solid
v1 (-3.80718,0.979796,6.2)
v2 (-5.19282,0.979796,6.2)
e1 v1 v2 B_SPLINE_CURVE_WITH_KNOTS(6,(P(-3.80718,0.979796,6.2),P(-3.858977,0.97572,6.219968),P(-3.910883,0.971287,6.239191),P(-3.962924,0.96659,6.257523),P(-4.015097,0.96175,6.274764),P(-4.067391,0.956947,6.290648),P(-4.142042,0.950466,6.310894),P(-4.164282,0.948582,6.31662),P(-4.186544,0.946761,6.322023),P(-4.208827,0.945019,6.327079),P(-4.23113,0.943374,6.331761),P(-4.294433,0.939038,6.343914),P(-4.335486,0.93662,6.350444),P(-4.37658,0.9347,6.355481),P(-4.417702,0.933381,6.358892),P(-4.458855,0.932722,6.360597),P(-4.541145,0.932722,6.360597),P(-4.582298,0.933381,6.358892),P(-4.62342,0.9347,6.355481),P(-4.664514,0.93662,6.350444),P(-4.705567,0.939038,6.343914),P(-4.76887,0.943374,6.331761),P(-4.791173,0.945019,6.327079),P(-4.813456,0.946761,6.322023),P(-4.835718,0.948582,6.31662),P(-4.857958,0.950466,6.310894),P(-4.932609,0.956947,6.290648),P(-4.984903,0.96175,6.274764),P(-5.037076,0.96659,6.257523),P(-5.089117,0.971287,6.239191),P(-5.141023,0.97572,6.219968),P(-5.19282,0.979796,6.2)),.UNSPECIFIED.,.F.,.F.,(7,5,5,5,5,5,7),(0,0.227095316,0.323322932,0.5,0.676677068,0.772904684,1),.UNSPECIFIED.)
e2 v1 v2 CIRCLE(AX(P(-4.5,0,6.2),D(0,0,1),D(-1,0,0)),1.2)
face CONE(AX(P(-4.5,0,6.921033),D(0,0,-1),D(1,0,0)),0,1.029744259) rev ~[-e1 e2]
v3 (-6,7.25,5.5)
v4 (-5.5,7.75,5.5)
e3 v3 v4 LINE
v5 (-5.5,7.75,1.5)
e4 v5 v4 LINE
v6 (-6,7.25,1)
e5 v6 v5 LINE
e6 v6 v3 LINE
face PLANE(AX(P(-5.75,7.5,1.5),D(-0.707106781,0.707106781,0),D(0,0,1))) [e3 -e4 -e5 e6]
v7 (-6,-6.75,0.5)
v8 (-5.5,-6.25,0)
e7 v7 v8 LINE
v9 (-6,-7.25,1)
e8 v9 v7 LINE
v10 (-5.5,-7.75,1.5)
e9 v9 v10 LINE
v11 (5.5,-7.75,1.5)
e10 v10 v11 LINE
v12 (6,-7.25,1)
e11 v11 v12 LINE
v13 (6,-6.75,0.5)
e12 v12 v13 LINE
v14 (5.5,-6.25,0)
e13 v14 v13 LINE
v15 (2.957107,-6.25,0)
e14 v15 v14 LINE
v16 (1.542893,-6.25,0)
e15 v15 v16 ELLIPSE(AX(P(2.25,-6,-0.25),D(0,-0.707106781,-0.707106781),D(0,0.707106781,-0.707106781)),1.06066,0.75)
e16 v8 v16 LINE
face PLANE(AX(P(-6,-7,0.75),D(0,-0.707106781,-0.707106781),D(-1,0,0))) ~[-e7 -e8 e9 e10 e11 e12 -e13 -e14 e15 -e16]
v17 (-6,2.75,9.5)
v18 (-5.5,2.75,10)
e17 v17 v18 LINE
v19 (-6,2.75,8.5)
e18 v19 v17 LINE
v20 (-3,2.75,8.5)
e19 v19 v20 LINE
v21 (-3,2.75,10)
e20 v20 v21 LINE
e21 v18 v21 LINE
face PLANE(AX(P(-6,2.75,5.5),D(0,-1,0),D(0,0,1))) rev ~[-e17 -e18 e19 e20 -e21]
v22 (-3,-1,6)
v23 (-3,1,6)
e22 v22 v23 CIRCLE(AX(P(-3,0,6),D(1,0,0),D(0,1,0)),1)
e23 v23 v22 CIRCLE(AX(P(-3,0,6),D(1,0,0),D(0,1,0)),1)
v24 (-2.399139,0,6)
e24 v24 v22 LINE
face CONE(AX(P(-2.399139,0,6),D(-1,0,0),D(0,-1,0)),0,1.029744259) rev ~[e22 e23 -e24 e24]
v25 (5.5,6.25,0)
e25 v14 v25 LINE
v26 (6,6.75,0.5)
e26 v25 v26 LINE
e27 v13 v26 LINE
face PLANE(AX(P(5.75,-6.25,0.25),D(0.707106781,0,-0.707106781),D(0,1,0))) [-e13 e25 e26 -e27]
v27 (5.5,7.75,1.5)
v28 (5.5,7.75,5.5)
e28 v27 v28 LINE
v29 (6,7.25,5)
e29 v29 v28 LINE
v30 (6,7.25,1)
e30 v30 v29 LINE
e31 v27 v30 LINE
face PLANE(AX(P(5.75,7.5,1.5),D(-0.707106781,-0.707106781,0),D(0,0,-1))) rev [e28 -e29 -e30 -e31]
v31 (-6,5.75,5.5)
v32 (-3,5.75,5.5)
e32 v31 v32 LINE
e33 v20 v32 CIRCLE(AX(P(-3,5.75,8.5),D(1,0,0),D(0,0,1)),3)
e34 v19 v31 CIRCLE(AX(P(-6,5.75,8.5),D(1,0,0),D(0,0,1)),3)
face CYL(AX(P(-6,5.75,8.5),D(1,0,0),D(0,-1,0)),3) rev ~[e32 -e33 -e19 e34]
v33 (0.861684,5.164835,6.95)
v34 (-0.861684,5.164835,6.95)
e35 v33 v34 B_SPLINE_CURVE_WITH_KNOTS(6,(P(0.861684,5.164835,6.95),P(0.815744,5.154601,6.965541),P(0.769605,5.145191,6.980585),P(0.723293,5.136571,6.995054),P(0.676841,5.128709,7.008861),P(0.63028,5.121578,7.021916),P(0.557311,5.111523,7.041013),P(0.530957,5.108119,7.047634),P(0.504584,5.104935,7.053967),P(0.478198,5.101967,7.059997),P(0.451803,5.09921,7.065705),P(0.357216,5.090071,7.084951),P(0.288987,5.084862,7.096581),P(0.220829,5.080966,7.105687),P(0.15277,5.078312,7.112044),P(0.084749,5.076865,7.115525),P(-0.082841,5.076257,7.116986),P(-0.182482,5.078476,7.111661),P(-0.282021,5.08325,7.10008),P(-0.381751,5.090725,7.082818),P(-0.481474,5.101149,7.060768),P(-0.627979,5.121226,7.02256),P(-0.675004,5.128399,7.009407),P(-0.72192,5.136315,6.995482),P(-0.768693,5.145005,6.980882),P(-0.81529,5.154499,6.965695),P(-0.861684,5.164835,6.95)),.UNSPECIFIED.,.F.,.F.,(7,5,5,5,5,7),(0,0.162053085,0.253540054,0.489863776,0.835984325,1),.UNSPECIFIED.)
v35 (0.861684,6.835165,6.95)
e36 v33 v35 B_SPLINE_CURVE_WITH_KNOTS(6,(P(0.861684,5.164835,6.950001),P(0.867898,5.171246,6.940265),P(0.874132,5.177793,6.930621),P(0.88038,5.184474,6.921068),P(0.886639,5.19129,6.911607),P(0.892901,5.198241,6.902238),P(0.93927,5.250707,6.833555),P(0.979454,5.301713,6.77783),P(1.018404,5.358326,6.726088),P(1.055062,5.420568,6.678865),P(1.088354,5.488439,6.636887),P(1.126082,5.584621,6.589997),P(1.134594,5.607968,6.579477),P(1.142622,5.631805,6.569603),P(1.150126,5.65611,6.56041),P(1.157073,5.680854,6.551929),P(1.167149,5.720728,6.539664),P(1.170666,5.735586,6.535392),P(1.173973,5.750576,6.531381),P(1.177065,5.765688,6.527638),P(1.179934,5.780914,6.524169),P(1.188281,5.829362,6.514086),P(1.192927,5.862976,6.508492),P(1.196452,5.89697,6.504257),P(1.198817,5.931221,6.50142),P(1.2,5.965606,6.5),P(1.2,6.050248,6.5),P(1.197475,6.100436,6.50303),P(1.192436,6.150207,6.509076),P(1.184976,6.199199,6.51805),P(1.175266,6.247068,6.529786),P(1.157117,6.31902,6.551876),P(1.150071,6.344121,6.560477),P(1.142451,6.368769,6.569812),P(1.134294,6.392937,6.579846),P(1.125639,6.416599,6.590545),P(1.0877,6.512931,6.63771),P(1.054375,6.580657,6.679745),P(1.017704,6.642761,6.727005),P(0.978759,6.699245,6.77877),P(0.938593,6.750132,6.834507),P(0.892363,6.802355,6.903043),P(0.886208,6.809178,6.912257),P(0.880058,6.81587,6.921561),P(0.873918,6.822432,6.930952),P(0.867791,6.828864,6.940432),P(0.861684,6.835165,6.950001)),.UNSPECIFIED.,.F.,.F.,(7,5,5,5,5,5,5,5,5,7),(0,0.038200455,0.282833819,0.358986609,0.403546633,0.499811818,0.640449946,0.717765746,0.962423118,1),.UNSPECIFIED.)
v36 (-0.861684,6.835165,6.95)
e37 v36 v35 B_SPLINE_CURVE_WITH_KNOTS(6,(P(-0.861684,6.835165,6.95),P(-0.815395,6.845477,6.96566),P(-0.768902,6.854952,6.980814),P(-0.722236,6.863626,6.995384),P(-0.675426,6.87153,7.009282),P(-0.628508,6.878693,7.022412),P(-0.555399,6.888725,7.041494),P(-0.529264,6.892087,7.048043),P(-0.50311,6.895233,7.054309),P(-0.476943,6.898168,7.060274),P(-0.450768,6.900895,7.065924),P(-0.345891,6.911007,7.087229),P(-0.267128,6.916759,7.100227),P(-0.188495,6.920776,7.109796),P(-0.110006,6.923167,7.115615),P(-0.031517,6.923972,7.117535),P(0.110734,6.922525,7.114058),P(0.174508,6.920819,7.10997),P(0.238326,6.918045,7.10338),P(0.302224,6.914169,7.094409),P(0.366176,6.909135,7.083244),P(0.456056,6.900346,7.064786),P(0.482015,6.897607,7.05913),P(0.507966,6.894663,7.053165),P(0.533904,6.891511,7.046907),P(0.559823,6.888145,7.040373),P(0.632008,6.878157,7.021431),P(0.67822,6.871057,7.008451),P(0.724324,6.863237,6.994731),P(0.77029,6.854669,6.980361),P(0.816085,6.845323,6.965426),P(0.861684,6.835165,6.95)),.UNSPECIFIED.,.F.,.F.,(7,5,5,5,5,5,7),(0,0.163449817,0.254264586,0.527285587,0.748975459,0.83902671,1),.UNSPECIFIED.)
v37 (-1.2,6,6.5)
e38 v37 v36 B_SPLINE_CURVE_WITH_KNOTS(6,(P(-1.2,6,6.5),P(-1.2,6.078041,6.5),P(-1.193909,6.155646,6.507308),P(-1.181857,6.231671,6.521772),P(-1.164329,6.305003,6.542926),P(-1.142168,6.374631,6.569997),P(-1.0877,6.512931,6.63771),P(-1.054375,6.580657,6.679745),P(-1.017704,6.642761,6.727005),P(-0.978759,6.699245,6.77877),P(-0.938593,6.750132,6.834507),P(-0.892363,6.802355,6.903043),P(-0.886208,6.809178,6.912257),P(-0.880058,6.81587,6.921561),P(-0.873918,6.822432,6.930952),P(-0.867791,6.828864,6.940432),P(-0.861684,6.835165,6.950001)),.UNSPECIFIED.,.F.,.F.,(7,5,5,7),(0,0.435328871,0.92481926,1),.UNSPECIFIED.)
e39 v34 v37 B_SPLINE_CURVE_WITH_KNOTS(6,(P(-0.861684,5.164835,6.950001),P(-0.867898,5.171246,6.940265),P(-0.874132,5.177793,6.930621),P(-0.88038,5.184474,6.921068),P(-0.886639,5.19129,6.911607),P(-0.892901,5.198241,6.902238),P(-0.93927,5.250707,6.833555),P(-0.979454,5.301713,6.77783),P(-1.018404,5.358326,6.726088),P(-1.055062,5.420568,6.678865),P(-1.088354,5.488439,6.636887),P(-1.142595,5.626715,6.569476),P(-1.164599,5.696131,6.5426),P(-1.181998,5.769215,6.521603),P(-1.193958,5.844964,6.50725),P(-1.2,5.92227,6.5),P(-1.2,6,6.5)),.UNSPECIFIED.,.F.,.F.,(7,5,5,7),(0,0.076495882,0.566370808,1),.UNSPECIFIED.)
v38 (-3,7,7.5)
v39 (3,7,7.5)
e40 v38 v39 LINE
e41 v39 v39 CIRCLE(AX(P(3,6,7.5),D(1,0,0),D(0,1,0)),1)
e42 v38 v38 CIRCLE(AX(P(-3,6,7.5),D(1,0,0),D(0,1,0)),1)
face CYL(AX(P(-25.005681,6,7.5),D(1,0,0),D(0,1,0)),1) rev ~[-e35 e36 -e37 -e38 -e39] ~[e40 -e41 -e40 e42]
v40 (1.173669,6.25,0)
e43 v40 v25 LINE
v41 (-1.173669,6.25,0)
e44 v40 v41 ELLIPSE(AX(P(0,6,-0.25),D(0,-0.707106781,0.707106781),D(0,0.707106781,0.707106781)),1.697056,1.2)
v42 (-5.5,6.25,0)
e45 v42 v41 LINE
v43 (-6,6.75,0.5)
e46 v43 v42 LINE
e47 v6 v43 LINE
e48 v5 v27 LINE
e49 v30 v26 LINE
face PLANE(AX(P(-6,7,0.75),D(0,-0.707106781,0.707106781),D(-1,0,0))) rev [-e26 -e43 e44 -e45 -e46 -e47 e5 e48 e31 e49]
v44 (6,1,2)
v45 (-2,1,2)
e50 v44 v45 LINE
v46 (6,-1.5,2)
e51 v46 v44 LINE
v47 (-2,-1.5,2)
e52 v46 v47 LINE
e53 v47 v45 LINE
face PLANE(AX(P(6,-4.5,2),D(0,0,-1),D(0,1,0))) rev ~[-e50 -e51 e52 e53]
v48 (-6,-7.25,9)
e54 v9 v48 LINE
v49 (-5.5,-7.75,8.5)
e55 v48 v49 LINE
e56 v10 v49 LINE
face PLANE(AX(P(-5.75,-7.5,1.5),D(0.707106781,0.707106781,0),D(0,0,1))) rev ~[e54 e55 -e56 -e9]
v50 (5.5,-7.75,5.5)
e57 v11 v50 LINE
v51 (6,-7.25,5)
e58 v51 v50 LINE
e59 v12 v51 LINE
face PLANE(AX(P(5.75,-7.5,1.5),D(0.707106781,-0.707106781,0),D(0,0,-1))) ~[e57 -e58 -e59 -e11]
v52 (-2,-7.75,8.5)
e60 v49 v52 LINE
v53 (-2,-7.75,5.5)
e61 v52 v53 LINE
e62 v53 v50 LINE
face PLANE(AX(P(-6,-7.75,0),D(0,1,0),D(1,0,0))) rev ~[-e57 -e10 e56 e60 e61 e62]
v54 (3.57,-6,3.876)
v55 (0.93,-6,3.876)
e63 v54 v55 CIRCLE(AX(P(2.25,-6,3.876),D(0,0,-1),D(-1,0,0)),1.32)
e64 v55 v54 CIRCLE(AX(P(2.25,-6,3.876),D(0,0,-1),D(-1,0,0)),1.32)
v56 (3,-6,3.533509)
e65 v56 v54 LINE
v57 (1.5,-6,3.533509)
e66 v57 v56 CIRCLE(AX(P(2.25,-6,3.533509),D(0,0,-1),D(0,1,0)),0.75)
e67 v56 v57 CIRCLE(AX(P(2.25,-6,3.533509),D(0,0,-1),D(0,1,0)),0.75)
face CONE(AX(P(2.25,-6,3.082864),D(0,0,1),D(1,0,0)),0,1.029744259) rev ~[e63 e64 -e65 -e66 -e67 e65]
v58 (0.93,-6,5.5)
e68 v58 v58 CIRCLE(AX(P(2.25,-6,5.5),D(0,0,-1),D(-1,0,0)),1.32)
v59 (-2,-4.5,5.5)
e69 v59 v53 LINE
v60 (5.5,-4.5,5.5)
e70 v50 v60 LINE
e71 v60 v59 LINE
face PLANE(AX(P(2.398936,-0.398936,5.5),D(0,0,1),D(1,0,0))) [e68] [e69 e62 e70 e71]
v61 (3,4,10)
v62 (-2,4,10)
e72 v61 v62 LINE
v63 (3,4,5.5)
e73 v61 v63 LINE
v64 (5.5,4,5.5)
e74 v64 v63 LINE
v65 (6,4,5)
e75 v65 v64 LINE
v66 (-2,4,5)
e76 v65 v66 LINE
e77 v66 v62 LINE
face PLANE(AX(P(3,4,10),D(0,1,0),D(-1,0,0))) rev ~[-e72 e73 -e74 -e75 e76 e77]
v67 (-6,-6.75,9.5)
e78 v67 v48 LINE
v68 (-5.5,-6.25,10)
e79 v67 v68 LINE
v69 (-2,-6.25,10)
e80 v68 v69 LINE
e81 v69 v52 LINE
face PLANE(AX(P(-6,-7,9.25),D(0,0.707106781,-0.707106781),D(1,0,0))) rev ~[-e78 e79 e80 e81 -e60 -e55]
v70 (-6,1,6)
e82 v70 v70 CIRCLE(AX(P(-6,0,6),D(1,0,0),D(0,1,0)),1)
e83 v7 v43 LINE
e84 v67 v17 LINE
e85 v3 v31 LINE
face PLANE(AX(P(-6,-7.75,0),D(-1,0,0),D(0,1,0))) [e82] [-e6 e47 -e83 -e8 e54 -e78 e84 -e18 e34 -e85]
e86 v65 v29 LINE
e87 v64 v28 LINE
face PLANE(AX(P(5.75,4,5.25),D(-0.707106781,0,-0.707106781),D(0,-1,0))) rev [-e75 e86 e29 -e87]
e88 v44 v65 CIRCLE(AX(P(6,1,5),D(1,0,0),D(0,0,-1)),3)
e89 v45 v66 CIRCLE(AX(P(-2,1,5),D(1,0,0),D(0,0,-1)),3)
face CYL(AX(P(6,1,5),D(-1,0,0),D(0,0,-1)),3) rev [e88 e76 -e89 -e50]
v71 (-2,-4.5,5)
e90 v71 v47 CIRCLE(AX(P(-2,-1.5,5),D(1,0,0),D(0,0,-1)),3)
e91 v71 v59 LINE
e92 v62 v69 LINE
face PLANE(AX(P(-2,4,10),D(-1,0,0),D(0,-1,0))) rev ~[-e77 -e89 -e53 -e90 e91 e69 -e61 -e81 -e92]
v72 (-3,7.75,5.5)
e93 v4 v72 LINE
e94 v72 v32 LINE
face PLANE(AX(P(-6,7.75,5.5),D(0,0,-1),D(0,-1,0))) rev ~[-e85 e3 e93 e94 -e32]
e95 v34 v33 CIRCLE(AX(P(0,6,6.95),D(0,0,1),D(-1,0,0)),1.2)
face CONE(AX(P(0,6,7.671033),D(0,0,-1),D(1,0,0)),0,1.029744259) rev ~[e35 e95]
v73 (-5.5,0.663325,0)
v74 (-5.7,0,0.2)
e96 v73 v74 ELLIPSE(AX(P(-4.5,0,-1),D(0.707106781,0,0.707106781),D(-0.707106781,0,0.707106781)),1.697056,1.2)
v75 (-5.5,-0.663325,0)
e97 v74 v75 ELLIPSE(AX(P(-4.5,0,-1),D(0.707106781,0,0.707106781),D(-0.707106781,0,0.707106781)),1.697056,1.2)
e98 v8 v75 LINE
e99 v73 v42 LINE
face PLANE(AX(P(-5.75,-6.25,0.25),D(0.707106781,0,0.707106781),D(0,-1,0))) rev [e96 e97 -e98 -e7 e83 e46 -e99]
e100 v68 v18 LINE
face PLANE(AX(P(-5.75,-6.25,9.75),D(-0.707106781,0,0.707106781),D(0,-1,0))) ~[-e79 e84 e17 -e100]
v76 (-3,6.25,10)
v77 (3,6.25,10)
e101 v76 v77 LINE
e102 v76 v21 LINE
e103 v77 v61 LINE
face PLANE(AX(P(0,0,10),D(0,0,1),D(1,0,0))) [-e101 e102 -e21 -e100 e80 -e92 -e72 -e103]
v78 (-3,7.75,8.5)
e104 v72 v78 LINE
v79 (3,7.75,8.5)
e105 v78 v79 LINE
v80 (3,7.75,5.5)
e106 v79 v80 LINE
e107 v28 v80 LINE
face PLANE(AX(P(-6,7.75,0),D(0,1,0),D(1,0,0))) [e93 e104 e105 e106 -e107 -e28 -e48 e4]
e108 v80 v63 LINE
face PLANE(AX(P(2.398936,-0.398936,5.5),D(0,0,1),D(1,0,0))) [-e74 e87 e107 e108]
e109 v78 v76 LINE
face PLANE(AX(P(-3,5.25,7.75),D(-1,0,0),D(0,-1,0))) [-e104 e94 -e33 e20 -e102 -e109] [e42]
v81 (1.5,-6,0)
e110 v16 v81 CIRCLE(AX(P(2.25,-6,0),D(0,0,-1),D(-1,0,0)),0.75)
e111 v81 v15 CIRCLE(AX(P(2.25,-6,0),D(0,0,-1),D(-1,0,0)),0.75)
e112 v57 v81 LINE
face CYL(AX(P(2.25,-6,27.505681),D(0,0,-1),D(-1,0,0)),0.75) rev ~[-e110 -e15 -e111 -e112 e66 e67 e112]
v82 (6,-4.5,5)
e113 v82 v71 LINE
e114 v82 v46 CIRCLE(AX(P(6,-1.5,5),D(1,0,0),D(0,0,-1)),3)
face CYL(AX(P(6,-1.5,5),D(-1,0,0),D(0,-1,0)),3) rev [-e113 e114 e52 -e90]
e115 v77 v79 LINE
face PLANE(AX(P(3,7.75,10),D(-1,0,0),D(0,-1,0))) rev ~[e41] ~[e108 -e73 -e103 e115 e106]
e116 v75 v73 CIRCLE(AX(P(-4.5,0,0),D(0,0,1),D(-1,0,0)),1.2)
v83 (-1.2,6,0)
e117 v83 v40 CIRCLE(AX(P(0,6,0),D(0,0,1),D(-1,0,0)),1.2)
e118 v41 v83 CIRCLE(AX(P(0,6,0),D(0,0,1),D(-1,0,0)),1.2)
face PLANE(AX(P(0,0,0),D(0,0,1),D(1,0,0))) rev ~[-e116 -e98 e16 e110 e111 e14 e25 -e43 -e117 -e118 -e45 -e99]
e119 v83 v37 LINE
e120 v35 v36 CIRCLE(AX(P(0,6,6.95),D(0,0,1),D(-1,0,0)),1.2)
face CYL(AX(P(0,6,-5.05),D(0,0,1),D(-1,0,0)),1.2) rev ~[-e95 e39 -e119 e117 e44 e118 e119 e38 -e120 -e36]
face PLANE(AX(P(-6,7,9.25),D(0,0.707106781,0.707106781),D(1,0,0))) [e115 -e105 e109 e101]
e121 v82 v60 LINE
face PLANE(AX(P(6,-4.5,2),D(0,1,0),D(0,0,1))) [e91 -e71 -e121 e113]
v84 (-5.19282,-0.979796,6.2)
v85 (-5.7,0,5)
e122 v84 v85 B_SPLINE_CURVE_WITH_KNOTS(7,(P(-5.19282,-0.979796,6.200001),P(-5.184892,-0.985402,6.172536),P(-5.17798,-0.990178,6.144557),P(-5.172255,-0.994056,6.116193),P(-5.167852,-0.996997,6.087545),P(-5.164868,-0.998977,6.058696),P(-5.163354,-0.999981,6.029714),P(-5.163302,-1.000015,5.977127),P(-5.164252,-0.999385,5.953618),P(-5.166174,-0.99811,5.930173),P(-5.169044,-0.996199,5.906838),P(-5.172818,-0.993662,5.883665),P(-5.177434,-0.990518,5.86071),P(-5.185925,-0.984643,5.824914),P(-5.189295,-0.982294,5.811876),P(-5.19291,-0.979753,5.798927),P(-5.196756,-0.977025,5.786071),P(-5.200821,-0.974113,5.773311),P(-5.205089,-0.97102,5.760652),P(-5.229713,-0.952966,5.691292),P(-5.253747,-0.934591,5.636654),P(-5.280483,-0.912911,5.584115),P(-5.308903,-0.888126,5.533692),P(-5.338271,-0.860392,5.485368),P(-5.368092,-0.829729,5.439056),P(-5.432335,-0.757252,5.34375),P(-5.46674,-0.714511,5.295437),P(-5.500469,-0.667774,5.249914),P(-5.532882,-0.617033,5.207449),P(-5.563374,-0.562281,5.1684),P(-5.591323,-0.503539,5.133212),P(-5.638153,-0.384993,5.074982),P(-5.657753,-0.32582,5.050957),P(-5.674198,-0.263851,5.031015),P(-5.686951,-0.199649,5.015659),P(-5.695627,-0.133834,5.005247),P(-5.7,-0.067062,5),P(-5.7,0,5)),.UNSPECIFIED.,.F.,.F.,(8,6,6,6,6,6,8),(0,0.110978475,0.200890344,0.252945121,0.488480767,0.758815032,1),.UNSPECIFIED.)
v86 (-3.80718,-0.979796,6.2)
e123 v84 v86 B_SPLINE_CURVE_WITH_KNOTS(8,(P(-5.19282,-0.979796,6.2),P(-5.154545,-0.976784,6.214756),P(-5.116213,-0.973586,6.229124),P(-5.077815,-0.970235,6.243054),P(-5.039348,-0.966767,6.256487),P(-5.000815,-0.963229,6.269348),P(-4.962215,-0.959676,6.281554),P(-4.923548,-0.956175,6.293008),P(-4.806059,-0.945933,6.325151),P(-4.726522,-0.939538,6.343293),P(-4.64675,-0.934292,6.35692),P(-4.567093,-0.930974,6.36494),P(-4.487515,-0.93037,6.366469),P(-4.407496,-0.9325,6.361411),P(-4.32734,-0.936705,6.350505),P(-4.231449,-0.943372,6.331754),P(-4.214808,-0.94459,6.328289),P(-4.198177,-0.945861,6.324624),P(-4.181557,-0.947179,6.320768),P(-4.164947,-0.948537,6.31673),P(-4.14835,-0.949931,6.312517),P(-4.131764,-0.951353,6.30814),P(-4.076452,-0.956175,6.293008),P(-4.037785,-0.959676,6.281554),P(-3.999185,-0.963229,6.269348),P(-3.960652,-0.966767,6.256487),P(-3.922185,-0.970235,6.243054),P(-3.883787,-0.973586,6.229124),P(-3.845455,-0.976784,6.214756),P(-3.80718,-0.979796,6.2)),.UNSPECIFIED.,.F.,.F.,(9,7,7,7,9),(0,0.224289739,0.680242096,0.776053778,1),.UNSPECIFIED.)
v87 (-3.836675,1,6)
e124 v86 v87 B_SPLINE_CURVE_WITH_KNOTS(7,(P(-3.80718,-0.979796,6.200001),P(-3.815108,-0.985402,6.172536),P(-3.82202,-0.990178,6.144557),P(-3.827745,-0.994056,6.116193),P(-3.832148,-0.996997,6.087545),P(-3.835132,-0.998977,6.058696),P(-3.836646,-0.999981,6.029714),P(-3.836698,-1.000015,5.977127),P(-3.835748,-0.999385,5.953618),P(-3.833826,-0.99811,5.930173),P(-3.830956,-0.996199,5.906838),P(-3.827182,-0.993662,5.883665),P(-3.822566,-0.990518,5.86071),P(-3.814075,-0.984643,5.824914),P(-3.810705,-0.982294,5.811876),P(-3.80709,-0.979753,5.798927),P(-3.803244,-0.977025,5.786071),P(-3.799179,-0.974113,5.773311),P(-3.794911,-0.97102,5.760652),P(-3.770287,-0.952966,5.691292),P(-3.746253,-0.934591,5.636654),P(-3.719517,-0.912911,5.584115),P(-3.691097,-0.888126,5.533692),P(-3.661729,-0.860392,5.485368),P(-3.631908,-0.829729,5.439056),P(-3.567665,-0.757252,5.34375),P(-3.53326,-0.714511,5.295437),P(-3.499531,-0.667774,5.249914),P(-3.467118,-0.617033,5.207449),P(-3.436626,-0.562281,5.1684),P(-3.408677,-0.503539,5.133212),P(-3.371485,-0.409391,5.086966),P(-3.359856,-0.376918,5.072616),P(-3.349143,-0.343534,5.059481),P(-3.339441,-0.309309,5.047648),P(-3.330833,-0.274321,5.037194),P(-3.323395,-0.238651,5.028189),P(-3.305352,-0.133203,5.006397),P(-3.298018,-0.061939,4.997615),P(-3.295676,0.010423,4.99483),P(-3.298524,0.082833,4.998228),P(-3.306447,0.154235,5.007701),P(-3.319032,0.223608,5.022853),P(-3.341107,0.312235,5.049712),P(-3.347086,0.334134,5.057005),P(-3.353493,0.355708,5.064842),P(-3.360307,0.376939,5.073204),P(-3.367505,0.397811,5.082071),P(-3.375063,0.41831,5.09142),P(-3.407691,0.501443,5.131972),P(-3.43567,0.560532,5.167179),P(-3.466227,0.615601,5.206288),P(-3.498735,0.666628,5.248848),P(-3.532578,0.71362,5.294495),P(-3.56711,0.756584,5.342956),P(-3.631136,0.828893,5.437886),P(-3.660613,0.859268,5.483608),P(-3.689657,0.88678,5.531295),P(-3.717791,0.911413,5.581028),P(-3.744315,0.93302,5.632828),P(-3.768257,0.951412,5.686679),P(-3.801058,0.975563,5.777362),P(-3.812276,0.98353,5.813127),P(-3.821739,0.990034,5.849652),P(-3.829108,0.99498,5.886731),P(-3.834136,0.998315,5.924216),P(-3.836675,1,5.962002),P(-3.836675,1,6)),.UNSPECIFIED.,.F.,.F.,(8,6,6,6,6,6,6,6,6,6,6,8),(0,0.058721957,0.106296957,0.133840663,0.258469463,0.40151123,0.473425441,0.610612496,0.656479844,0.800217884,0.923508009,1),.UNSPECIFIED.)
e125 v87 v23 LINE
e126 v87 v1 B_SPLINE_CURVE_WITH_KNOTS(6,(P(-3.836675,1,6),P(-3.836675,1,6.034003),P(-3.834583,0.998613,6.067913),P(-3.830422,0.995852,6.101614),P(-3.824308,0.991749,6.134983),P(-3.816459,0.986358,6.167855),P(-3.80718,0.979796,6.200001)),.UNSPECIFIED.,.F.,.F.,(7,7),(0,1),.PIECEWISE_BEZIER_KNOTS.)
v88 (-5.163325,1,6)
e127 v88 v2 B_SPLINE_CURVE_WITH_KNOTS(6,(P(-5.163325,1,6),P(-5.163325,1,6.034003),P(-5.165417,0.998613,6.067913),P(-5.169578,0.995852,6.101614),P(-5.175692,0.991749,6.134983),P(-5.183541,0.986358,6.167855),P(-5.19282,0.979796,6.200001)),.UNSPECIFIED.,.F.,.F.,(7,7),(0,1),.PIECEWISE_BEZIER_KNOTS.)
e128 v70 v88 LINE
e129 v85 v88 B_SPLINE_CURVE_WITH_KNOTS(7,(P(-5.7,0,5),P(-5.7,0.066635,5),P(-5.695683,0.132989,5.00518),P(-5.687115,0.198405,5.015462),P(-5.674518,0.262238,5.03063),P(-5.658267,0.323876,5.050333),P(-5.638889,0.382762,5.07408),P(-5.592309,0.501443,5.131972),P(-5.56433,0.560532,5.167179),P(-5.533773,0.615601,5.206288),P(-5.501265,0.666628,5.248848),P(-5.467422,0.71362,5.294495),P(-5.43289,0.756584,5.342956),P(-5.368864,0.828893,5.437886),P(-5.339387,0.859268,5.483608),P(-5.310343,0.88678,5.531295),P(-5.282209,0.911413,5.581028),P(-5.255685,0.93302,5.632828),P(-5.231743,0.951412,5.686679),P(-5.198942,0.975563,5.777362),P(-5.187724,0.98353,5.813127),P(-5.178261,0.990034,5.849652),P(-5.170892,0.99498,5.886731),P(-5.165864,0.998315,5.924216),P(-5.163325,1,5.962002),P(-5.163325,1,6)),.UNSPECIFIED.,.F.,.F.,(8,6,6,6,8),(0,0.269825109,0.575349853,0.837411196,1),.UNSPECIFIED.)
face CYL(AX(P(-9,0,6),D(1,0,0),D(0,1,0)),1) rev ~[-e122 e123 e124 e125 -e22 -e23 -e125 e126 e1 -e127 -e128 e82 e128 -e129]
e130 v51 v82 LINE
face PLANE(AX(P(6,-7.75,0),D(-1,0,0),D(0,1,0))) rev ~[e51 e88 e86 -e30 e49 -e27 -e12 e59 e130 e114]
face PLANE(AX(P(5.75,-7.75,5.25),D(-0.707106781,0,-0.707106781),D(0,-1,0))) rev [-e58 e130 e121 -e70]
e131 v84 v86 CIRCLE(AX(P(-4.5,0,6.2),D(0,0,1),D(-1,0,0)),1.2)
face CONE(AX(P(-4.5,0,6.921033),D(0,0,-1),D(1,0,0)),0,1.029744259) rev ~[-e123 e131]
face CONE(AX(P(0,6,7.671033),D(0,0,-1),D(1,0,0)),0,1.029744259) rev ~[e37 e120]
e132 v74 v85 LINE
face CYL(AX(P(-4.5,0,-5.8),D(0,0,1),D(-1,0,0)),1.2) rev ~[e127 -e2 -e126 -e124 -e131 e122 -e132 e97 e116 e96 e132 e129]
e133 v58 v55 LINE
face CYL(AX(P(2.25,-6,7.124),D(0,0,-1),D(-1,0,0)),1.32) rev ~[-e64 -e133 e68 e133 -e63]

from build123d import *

# Parameters (mm, degrees)
F0_W      = 12
F0_H      = 15.5
F1_DEPTH  = 10
F3_DEPTH  = 4.5
F4_W      = 8.5
F4_H      = 3.5
F5_DEPTH  = 8
F6_R      = 3
F7_SIZE   = 1.5
F9_D      = 2
F9_DEPTH  = 3
F9_TIP    = 0.600860619
F12_W     = 5
F12_H     = 4.5
F13_DEPTH = 3
F14_R     = 3
F16_D     = 2
F18_D     = 1.5
F20_D     = 2.64
F20_DEPTH = 1.624
F20_TIP   = 0.7931360171
F21_SIZE  = 0.5
F23_D     = 2.4
F23_DEPTH = 6
F23_START = 0.2
F23_TIP   = 0.7210327428
F25_D     = 2.4
F25_DEPTH = 6
F25_START = 0.95
F25_TIP   = 0.7210327428


# Not quite as in the source:
# - a feature of the source that left no trace in its solid (it failed there, or was rolled back) is left out


with BuildPart() as f1:
    # F0 (on Top) → F1 (new body)
    with BuildSketch(Plane.XY):
        Rectangle(F0_W, F0_H)
    extrude(amount=F1_DEPTH)

    # F2 (on face) → F3 (cut)
    with BuildSketch(Plane.XY.offset(10)):
        Polygon((-2, -7.75), (6, -7.75), (6, 7.75), (3, 7.75), (3, 4), (-2, 4), align=None)
    extrude(amount=-F3_DEPTH, mode=Mode.SUBTRACT)

    # F4 (on face) → F5 (cut)
    with BuildSketch(Plane.YZ.offset(6)):
        with Locations((-0.25, 3.75)):
            Rectangle(F4_W, F4_H)
    extrude(amount=-F5_DEPTH, mode=Mode.SUBTRACT)

    # F6
    f6_edges = [f1.edges().sort_by_distance(p)[0] for p in [
        (2, 4, 2),
        (2, -4.5, 2),
    ]]
    fillet(f6_edges, radius=F6_R)

    # F7
    f7_edges = [f1.edges().sort_by_distance(p)[0] for p in [
        (-1.5, 7.75, 10),
        (0, -7.75, 0),
        (-4, -7.75, 10),
        (0, 7.75, 0),
    ]]
    chamfer(f7_edges, length=F7_SIZE)

    # F9
    with Locations(Plane(origin=(-6, 0, 0), x_dir=(0, -1, 0), z_dir=(-1, 0, 0))):
        with Locations((0, 6)):
            Hole(F9_D / 2, depth=F9_DEPTH)
            with Locations((0, 0, -(F9_DEPTH + F9_TIP / 2))):  # 118° drill point
                Cone(0, F9_D / 2, F9_TIP, mode=Mode.SUBTRACT)

    # F12 (on face) → F13 (cut)
    with BuildSketch(Plane(origin=(-6, 0, 0), x_dir=(0, -1, 0), z_dir=(-1, 0, 0))):
        with Locations((-5.25, 7.75)):
            Rectangle(F12_W, F12_H)
    extrude(amount=-F13_DEPTH, mode=Mode.SUBTRACT)

    # F14
    f14_edges = [f1.edges().sort_by_distance(p)[0] for p in [
        (-4.5, 2.75, 5.5),
    ]]
    fillet(f14_edges, radius=F14_R)

    # F16 (through all)
    with Locations(Plane(origin=(-3, 0, 0), x_dir=(0, -1, 0), z_dir=(-1, 0, 0))):
        with Locations((-6, 7.5)):
            Hole(F16_D / 2)

    # F18 (through all)
    with Locations(Plane.XY.offset(5.5)):
        with Locations((2.25, -6)):
            Hole(F18_D / 2)

    # F20
    with Locations(Plane.XY.offset(5.5)):
        with Locations((2.25, -6)):
            Hole(F20_D / 2, depth=F20_DEPTH)
            with Locations((0, 0, -(F20_DEPTH + F20_TIP / 2))):  # 118° drill point
                Cone(0, F20_D / 2, F20_TIP, mode=Mode.SUBTRACT)

    # F21
    f21_edges = [f1.edges().sort_by_distance(p)[0] for p in [
        (-6, -1.75, 10),
        (6, -6.125, 5.5),
        (6, 5.875, 5.5),
        (6, 7.75, 3.5),
        (6, 0, 0),
        (-6, 0, 0),
        (-6, -7.75, 5),
        (-6, 7.75, 3.5),
        (6, -7.75, 3.5),
    ]]
    chamfer(f21_edges, length=F21_SIZE)

    # F23
    # its depths count from where the whole tool has entered the part; down to there all is cleared
    with Locations(Plane(origin=(0, 0, 0), x_dir=(1, 0, 0), z_dir=(0, 0, -1)).offset(-F23_START)):
        with Locations((-4.5, 0)):
            Hole(F23_D / 2, depth=F23_DEPTH)
            with Locations((0, 0, -(F23_DEPTH + F23_TIP / 2))):  # 118° drill point
                Cone(0, F23_D / 2, F23_TIP, mode=Mode.SUBTRACT)

    # F25
    # its depths count from where the whole tool has entered the part; down to there all is cleared
    with Locations(Plane(origin=(0, 0, 0), x_dir=(1, 0, 0), z_dir=(0, 0, -1)).offset(-F25_START)):
        with Locations((0, -6)):
            Hole(F25_D / 2, depth=F25_DEPTH)
            with Locations((0, 0, -(F25_DEPTH + F25_TIP / 2))):  # 118° drill point
                Cone(0, F25_D / 2, F25_TIP, mode=Mode.SUBTRACT)


solid = f1.part
